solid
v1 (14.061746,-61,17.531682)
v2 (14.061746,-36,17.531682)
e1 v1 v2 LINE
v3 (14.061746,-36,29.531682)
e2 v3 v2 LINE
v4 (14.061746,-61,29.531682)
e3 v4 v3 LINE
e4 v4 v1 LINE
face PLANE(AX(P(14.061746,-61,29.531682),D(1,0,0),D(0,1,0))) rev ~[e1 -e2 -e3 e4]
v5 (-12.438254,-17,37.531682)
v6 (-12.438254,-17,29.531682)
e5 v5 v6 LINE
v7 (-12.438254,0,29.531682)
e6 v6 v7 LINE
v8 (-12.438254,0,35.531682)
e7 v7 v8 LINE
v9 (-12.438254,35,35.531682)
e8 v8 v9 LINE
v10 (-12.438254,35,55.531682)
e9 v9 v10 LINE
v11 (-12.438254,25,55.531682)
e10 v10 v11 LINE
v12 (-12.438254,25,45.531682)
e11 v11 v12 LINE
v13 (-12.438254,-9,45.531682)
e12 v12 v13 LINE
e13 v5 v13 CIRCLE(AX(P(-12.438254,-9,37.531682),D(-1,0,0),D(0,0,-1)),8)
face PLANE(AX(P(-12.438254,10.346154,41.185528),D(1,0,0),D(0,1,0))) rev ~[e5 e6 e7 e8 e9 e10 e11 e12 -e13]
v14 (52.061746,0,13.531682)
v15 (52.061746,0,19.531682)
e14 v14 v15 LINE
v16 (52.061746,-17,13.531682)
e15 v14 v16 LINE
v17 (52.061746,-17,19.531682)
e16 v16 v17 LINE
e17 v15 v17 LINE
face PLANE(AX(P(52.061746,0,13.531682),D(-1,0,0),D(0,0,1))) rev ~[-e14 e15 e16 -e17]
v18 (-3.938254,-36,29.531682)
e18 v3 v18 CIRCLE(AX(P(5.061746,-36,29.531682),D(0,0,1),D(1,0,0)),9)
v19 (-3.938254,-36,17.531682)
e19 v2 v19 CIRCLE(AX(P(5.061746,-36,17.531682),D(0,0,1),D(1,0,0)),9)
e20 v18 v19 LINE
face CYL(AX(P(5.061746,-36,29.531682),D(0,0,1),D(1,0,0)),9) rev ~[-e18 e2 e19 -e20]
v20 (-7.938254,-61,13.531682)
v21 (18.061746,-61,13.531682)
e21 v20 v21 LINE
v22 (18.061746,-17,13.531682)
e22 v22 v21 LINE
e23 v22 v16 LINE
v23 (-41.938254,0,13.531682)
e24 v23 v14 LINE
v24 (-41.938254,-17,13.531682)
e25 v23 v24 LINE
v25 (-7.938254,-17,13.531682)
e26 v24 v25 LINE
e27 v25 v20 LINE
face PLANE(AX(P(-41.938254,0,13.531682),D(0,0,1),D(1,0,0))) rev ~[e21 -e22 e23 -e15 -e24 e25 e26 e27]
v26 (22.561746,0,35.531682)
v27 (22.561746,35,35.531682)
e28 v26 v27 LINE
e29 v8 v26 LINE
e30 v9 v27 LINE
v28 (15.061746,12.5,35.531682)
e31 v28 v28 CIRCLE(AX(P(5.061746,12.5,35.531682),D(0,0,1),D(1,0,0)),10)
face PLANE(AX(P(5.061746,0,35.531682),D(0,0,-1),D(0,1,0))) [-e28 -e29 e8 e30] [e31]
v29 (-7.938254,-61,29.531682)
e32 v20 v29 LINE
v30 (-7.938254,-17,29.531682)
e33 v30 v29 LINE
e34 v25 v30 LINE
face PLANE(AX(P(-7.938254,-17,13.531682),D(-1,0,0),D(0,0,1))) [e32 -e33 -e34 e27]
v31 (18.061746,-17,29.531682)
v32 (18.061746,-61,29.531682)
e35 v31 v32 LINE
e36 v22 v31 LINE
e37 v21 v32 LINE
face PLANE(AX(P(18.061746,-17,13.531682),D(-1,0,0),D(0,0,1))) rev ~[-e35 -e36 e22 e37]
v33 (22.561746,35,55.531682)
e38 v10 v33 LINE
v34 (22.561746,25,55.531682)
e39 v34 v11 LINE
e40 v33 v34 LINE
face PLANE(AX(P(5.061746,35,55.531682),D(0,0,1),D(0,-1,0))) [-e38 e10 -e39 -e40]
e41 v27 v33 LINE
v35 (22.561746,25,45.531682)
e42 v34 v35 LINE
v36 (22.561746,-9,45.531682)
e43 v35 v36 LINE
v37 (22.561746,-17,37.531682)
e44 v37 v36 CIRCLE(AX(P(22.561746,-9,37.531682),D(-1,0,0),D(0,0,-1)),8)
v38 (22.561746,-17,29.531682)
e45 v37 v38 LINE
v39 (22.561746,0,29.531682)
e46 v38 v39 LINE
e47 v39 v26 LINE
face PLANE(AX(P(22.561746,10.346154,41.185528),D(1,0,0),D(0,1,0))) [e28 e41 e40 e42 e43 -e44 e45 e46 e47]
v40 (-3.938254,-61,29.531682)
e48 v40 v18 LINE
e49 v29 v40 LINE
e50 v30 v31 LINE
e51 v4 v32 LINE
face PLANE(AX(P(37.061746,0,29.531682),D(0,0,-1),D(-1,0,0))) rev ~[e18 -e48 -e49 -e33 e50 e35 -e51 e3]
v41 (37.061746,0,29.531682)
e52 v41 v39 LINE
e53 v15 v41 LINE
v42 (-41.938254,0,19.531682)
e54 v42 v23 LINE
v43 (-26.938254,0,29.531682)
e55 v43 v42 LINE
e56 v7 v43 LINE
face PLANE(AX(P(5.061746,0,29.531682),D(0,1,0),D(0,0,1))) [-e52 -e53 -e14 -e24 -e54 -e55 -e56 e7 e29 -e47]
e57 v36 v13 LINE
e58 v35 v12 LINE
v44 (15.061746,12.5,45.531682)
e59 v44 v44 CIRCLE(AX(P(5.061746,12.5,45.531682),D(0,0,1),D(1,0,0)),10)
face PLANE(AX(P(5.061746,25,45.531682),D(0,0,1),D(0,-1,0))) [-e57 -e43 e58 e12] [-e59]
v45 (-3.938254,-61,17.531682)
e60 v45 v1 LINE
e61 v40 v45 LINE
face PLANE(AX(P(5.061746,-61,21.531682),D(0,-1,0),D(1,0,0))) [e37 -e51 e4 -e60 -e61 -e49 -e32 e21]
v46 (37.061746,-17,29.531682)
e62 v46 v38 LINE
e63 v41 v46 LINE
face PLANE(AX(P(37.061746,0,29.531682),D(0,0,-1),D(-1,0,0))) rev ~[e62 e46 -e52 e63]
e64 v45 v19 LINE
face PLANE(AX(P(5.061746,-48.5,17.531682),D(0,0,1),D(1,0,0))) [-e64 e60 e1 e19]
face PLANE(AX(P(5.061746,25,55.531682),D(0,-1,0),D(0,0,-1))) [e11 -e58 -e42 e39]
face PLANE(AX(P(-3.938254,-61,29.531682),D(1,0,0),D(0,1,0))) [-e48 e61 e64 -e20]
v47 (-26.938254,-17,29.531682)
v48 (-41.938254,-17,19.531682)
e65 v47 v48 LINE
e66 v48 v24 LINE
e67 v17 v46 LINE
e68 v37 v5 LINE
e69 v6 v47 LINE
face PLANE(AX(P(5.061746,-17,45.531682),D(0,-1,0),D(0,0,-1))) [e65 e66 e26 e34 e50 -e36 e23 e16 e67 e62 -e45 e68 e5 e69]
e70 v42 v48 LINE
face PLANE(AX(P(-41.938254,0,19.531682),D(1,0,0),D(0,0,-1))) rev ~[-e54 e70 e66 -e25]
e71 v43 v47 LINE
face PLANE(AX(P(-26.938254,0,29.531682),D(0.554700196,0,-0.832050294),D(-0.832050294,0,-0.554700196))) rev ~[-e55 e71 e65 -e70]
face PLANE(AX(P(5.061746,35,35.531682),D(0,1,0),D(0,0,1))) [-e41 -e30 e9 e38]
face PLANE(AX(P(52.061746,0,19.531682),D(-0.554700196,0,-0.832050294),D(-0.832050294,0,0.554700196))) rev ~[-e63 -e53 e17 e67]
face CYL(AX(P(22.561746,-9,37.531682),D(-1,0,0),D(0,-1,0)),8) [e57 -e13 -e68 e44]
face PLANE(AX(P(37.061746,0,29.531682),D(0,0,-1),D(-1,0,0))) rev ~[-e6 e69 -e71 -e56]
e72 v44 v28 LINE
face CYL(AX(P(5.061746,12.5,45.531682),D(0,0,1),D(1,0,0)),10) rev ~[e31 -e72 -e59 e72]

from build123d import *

# Parameters (mm, degrees)
F1_DEPTH  = 17
F2_W      = 26
F2_H      = 16
F3_DEPTH  = 44
F4_W      = 18
F4_H      = 25
F5_DEPTH  = 12
F8_DEPTH  = 17.5
F9_R      = 8
F10_R     = 10
F11_DEPTH = 25


# Not quite as in the source:
# - the program builds the solid bodies; features that only make, move or delete a surface that nothing else refers to are left out


with BuildPart() as f1:
    # F0 (on Front) → F1 (new body)
    with BuildSketch(Plane.XZ):
        Polygon((52.0617456436, 19.5316821036), (37.0617456436, 29.5316821036), (-26.9382543564, 29.5316821036), (-41.9382543564, 19.5316821036), (-41.9382543564, 13.5316821036), (52.0617456436, 13.5316821036), align=None)
    extrude(amount=F1_DEPTH)

    # F2 (on face) → F3 (join)
    with BuildSketch(Plane.XZ.offset(17)):
        with Locations((5.0617456436, 21.5316821036)):
            Rectangle(F2_W, F2_H)
    extrude(amount=F3_DEPTH)

    # F4 (on face) → F5 (cut)
    with BuildSketch(Plane.XY.offset(29.5316821036)):
        with Locations((5.0617456436, -48.5)):
            Rectangle(F4_W, F4_H)
        with BuildLine():
            Line((-3.9382543564, -36), (14.0617456436, -36))
            ThreePointArc((14.0617456436, -36), (5.0617456436, -27), (-3.9382543564, -36))
        make_face()
    extrude(amount=-F5_DEPTH, mode=Mode.SUBTRACT)

    # F7 (on offset) → F8 (join, symmetric)
    with BuildSketch(Plane.YZ.offset(5.0617456436)):
        Polygon((-17, 45.5316821036), (-17, 29.5316821036), (0, 29.5316821036), (0, 35.5316821036), (35, 35.5316821036), (35, 55.5316821036), (25, 55.5316821036), (25, 45.5316821036), align=None)
    extrude(amount=F8_DEPTH, both=True)

    # F9
    f9_edges = [f1.edges().sort_by_distance(p)[0] for p in [
        (5.061746, -17, 45.531682),
    ]]
    fillet(f9_edges, radius=F9_R)

    # F10 (on face) → F11 (cut)
    with BuildSketch(Plane.XY.offset(45.5316821036)):
        with Locations((5.0617456436, 12.5)):
            Circle(F10_R)
    extrude(amount=-F11_DEPTH, mode=Mode.SUBTRACT)


solid = f1.part
